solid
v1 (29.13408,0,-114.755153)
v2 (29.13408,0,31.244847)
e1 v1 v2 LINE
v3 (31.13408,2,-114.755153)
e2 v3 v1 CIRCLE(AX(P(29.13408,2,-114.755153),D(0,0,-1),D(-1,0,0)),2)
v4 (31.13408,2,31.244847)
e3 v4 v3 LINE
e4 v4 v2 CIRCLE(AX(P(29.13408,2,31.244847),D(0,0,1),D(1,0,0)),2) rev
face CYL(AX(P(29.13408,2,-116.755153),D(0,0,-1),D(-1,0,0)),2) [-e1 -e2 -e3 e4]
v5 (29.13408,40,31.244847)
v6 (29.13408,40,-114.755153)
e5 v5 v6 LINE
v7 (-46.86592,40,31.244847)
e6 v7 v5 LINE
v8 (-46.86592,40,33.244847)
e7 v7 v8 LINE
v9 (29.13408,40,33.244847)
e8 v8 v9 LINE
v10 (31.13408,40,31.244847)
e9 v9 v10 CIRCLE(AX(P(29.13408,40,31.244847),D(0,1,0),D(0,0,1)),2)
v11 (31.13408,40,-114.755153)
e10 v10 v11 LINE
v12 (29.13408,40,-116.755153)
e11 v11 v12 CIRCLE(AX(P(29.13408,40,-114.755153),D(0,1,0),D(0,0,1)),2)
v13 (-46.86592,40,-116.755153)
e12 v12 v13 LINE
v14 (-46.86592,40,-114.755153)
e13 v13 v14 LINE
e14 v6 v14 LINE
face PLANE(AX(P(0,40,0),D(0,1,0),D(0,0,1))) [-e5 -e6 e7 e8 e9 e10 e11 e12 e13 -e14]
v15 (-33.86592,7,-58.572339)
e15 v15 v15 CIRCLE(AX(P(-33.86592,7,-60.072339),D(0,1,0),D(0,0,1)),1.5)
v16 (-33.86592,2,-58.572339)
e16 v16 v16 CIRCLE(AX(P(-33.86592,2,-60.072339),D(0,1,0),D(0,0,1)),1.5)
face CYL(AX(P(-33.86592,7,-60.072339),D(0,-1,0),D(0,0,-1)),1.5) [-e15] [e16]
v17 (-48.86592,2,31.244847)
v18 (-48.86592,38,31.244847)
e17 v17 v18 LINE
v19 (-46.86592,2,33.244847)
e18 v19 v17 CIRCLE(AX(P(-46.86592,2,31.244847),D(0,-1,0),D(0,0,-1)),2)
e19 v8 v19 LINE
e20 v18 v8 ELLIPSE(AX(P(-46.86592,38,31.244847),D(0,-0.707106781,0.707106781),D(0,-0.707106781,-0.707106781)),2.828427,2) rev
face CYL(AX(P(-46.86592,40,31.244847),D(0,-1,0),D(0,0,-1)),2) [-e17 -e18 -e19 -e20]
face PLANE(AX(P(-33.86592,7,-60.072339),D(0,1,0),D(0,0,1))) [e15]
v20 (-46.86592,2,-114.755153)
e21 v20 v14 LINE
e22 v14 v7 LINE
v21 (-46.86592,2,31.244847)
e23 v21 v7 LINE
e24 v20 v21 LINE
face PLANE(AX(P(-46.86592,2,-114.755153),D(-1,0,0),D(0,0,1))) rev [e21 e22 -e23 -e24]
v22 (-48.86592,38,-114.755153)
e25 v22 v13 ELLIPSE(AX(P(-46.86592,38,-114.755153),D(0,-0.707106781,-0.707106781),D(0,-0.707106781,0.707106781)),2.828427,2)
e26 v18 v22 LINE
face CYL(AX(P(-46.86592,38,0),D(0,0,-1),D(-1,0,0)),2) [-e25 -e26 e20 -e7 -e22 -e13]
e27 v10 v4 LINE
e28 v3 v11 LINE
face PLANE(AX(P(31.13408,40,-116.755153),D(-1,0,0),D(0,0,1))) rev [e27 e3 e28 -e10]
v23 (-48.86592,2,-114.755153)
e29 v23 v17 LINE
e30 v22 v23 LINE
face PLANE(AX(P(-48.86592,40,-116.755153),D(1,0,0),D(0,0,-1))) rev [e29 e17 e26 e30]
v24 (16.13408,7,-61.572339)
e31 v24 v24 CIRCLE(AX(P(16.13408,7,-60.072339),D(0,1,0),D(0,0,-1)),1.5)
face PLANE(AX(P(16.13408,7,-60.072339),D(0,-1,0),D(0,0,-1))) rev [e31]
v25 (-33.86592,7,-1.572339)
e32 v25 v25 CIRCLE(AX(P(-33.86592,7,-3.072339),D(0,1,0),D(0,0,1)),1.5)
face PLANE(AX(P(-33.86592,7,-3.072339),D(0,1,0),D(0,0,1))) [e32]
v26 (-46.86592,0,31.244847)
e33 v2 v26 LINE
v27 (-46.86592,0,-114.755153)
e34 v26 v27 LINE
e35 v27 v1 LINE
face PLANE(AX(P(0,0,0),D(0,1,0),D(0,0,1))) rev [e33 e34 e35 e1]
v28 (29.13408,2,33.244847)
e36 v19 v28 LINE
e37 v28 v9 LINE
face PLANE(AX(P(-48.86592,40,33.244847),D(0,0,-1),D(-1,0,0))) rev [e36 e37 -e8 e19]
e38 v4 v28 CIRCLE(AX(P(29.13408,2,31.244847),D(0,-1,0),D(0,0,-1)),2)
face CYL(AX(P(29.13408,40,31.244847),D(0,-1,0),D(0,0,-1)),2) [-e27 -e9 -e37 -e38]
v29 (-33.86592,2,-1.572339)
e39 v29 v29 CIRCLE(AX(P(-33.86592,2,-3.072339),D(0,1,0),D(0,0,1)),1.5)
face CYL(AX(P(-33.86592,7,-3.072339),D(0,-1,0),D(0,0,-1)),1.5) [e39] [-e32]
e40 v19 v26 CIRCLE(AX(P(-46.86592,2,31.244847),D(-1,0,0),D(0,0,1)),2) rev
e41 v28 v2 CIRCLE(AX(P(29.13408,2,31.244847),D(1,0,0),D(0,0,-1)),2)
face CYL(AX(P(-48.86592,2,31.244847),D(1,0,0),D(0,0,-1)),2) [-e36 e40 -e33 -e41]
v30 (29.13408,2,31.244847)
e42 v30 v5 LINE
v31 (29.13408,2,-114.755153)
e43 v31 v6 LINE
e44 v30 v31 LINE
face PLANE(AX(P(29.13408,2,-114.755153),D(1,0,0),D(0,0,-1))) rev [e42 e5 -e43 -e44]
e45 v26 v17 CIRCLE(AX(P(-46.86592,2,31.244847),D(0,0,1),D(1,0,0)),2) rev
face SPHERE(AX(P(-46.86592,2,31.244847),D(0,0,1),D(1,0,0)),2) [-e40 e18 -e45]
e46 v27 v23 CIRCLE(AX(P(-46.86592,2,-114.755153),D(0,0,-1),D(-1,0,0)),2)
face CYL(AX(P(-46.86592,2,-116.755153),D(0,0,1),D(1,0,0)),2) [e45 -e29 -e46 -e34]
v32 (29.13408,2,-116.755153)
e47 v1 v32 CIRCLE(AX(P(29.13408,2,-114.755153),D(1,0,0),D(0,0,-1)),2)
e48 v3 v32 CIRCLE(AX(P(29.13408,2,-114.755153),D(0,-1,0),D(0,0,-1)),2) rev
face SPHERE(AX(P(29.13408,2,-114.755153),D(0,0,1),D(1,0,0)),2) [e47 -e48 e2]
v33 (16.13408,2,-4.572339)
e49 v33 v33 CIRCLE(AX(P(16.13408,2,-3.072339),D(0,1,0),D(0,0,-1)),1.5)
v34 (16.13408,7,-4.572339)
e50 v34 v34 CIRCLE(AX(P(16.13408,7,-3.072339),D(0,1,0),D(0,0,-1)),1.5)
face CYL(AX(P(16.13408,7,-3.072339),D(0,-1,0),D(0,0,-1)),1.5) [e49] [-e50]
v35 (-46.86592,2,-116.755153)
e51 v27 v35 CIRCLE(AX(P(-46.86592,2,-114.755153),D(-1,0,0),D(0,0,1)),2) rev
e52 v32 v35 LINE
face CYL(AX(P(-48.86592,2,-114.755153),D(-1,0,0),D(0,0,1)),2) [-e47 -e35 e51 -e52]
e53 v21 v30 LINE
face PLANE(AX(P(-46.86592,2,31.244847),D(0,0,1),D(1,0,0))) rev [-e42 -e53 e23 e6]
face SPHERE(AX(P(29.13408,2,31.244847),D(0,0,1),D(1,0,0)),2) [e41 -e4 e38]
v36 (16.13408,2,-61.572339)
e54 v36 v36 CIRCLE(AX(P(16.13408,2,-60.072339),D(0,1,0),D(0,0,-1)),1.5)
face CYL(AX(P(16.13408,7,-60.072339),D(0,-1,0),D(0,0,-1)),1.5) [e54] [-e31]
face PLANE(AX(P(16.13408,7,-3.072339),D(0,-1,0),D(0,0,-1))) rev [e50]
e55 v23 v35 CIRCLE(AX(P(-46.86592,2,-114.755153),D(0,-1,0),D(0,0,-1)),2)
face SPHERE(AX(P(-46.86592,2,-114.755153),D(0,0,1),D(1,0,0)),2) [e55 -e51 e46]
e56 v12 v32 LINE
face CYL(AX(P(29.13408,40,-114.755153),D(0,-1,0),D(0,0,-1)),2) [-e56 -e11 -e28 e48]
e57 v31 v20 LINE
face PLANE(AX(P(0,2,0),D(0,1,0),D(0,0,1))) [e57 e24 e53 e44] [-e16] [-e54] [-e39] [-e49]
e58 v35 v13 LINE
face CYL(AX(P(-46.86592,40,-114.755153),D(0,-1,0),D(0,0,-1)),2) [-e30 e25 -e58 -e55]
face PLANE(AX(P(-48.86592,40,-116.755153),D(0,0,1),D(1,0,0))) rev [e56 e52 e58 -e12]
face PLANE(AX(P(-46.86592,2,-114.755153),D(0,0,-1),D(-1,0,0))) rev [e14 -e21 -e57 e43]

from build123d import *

# Parameters (mm, degrees)
SKETCH1_W           = 80
SKETCH1_H           = 150
BOSS_EXTRUDE1_DEPTH = 40
SKETCH2_W           = 76
SKETCH2_H           = 146
CUT_EXTRUDE1_DEPTH  = 38
SKETCH4_R           = 1.5
BOSS_EXTRUDE3_DEPTH = 5
FILLET1_R           = 2


with BuildPart() as part:
    # Sketch1 → Boss-Extrude1 (new body)
    with BuildSketch(Plane(origin=(0, 0, 0), x_dir=(1, 0, 0), z_dir=(0, 1, 0))):
        with Locations((-8.86592033, 41.755152562)):
            Rectangle(SKETCH1_W, SKETCH1_H)
    extrude(amount=BOSS_EXTRUDE1_DEPTH)

    # Sketch2 → Cut-Extrude1 (cut)
    with BuildSketch(Plane(origin=(0, 40, 0), x_dir=(1, 0, 0), z_dir=(0, 1, 0))):
        with Locations((-8.86592033, 41.755152562)):
            Rectangle(SKETCH2_W, SKETCH2_H)
    extrude(amount=-CUT_EXTRUDE1_DEPTH, mode=Mode.SUBTRACT)

    # Sketch4 → Boss-Extrude3 (add)
    with BuildSketch(Plane(origin=(0, 2, 0), x_dir=(1, 0, 0), z_dir=(0, 1, 0))):
        with Locations(Location((-33.86592033, 60.072338785, 0), (0, 0, 270))):
            Circle(SKETCH4_R)
        with Locations(Location((-33.86592033, 3.072338785, 0), (0, 0, 270))):
            Circle(SKETCH4_R)
        with Locations(Location((16.13407967, 60.072338785, 0), (0, 0, 90))):
            Circle(SKETCH4_R)
        with Locations(Location((16.13407967, 3.072338785, 0), (0, 0, 90))):
            Circle(SKETCH4_R)
    extrude(amount=BOSS_EXTRUDE3_DEPTH)

    # Fillet1
    fillet1_edges = [part.edges().sort_by_distance(p)[0] for p in [
        (-48.86592033, 40, -41.755152562),
        (-8.86592033, 0, -116.755152562),
        (31.13407967, 0, -41.755152562),
        (-8.86592033, 0, 33.244847438),
        (-48.86592033, 0, -41.755152562),
        (-48.86592033, 20, -116.755152562),
        (31.13407967, 20, -116.755152562),
        (31.13407967, 20, 33.244847438),
        (-48.86592033, 20, 33.244847438),
    ]]
    fillet(fillet1_edges, radius=FILLET1_R - 0.0001)  # a hair under: the kernel refuses the full size


solid = part.part
